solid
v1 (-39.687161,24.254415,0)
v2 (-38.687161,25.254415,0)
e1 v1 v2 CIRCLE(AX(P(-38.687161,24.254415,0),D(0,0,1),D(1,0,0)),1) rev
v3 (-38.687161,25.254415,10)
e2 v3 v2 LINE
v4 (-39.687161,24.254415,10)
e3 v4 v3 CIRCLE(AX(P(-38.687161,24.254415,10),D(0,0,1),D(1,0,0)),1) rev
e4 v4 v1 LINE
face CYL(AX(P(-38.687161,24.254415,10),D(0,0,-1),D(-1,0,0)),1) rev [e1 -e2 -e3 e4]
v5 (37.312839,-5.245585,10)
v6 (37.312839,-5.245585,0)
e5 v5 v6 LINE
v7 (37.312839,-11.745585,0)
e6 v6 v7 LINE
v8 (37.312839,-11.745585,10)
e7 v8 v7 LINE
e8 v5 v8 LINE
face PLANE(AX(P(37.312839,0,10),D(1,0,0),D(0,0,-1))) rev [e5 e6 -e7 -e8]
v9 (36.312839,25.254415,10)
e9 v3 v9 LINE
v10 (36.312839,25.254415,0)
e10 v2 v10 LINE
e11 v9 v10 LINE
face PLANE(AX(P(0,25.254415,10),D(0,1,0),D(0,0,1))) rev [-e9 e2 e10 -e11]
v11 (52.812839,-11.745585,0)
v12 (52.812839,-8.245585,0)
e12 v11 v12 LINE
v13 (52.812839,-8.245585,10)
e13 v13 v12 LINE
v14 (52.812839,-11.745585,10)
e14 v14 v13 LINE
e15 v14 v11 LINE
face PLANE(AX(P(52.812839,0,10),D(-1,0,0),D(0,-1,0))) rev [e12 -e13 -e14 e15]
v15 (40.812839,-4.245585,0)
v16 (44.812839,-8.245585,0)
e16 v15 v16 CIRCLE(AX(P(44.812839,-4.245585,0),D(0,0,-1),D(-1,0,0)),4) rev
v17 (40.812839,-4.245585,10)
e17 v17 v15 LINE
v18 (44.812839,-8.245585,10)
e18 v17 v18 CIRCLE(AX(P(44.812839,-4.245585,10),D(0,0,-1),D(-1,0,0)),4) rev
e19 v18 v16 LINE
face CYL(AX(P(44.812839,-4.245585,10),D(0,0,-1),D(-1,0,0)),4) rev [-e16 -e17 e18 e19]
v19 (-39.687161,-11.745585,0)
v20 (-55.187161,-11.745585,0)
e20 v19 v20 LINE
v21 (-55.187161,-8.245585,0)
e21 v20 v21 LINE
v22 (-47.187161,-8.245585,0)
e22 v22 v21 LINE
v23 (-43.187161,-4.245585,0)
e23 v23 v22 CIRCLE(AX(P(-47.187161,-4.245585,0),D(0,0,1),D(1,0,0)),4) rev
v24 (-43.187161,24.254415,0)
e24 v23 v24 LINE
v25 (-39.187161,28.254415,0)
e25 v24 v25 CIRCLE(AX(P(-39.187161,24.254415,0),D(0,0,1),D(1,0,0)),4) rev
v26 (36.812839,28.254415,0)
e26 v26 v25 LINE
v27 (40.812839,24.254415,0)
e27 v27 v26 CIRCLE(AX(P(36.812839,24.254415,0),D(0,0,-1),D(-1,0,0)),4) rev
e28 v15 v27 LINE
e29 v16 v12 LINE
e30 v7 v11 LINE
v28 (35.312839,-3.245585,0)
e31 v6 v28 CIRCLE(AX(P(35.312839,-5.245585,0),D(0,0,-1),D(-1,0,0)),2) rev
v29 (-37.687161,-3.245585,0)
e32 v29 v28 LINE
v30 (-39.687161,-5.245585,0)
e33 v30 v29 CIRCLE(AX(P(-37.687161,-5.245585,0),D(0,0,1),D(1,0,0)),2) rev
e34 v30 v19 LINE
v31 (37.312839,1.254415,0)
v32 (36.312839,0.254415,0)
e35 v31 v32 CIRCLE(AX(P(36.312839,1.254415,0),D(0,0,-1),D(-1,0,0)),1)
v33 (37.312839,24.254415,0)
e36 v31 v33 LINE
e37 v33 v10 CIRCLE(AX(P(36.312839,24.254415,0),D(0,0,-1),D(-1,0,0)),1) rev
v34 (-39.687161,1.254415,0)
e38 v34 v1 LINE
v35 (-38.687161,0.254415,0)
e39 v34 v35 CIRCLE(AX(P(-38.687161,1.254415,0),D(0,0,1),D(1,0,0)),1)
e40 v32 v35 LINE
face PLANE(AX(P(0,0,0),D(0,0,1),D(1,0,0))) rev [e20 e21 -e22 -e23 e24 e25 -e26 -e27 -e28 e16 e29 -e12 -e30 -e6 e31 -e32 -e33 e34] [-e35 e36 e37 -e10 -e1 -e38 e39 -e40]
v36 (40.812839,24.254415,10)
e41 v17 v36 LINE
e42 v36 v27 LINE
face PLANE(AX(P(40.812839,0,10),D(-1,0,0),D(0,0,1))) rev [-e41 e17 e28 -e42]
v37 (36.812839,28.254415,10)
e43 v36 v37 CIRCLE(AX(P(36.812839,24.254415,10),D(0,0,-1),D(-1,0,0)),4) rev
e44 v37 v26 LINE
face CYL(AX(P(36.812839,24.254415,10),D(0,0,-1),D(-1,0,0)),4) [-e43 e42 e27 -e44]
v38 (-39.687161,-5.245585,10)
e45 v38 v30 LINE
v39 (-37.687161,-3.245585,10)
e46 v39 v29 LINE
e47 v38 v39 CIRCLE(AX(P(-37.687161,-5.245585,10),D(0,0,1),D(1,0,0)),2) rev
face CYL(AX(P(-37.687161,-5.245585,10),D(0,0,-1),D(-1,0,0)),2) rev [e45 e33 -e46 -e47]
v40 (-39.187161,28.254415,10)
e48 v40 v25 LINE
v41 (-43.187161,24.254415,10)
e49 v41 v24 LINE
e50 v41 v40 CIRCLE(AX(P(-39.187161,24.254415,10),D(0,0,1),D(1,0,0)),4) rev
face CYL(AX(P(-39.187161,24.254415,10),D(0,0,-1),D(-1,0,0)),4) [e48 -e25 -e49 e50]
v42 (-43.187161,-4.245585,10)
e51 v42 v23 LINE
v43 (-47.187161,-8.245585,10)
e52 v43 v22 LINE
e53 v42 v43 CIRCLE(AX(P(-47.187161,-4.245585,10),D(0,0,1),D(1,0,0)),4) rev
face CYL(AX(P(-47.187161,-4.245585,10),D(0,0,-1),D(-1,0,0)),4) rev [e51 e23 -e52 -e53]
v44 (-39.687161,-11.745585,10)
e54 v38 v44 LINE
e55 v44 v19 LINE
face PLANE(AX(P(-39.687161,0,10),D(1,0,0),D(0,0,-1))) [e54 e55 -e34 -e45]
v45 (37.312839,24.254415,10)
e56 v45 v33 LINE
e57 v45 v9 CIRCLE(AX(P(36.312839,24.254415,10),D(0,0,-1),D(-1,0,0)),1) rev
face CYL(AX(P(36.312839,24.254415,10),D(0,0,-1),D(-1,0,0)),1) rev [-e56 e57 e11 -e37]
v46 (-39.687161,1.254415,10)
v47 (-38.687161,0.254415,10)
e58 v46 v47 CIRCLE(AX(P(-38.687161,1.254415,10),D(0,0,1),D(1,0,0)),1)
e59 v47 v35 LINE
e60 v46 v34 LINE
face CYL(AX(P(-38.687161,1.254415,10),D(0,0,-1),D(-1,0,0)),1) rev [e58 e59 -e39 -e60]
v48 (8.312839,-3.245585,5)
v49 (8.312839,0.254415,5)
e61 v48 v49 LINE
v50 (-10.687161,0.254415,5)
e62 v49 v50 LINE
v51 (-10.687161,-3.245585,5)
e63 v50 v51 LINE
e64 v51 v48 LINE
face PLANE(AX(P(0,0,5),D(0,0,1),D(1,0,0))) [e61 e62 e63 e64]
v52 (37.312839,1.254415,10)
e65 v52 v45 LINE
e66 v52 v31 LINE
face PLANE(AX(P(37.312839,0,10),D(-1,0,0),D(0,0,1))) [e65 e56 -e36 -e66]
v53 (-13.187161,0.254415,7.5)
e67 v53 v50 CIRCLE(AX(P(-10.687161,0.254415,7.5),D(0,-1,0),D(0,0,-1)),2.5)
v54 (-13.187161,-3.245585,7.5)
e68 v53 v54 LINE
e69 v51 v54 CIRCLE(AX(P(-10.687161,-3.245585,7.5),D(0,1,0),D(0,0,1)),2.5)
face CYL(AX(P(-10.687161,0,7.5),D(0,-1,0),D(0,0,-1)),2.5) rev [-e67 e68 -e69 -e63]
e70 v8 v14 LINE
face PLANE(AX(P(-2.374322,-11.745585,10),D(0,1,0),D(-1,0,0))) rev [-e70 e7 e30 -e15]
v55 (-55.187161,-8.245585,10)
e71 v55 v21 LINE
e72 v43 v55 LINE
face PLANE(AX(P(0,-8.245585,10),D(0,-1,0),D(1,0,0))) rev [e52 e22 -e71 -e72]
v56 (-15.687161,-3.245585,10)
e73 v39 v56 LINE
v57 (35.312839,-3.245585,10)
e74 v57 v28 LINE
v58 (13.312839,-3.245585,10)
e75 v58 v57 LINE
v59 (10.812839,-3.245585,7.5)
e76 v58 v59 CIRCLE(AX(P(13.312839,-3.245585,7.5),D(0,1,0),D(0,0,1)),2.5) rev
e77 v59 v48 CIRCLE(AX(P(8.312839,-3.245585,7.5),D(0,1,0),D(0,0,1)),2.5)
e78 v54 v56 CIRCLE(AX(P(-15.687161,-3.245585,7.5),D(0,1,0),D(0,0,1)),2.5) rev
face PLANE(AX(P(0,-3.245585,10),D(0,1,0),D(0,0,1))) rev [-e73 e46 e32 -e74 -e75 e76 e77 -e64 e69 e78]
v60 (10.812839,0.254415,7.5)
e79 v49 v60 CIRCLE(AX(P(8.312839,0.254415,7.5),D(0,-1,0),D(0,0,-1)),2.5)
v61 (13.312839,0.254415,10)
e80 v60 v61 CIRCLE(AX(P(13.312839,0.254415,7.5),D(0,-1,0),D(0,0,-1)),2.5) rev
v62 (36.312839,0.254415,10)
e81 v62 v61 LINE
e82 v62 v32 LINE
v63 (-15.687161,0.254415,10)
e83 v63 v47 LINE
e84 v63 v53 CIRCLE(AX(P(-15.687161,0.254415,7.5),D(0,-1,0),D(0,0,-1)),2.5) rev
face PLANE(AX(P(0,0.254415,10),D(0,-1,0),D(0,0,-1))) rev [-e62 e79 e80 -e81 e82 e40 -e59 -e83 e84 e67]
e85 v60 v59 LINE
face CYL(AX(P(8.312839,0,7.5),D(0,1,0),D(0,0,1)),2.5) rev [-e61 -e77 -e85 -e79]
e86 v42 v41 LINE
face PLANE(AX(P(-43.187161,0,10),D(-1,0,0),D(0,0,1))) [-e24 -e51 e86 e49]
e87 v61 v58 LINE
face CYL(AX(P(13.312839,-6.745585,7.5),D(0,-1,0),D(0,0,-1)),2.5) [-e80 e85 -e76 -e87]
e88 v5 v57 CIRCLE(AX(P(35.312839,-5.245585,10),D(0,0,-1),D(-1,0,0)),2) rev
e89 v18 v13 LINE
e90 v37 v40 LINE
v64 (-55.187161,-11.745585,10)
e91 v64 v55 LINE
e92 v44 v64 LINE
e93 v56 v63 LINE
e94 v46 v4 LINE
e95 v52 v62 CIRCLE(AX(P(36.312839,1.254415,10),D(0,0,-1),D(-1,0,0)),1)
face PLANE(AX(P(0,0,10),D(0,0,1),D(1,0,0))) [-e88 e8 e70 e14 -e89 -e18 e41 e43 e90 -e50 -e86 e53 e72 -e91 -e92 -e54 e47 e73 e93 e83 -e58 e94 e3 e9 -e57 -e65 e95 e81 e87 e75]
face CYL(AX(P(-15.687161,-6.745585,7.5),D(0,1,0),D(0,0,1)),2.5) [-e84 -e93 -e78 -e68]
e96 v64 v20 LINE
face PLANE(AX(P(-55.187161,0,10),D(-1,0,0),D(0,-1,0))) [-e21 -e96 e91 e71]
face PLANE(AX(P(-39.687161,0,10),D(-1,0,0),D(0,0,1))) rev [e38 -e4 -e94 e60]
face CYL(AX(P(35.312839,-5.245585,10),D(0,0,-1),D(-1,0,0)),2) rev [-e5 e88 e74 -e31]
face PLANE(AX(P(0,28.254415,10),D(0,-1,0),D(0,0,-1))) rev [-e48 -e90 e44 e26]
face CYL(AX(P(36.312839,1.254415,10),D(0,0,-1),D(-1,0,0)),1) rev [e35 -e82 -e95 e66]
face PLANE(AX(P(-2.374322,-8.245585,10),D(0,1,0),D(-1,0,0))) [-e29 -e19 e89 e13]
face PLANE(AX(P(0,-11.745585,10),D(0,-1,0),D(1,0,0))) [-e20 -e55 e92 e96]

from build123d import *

# Parameters (mm, degrees)
SALIENTE_EXTRUIR2_DEPTH = 10
CROQUIS9_W              = 24
CROQUIS9_H              = 7
CORTAR_EXTRUIR2_DEPTH   = 5
REDONDEO3_R             = 2.5


with BuildPart() as part:
    # Croquis1 → Saliente-Extruir2 (new body)
    with BuildSketch(Plane.XY):
        with BuildLine():
            ThreePointArc((-38.687161159, 0.254415054), (-39.39426794, 0.547308273), (-39.687161159, 1.254415054))
            Line((-39.687161159, 1.254415054), (-39.687161159, 24.254415054))
            ThreePointArc((-39.687161159, 24.254415054), (-39.39426794, 24.961521836), (-38.687161159, 25.254415054))
            Line((-38.687161159, 25.254415054), (-1.187161159, 25.254415054))
            Line((-1.187161159, 25.254415054), (-1.187161159, 28.254415054))
            Line((-1.187161159, 28.254415054), (-39.187161159, 28.254415054))
            ThreePointArc((-39.187161159, 28.254415054), (-42.015588284, 27.082842179), (-43.187161159, 24.254415054))
            Line((-43.187161159, 24.254415054), (-43.187161159, -3.245584946))
            Line((-43.187161159, -3.245584946), (-43.187161159, -4.245584946))
            ThreePointArc((-43.187161159, -4.245584946), (-44.358734034, -7.07401207), (-47.187161159, -8.245584946))
            Line((-47.187161159, -8.245584946), (-55.187161159, -8.245584946))
            Line((-55.187161159, -8.245584946), (-55.187161159, -11.745584946))
            Line((-55.187161159, -11.745584946), (-43.187161159, -11.745584946))
            Line((-43.187161159, -11.745584946), (-39.687161159, -11.745584946))
            Line((-39.687161159, -11.745584946), (-39.687161159, -5.245584946))
            ThreePointArc((-39.687161159, -5.245584946), (-39.101374721, -3.831371383), (-37.687161159, -3.245584946))
            Line((-37.687161159, -3.245584946), (-1.187161159, -3.245584946))
            Line((-1.187161159, -3.245584946), (-1.187161159, 0.254415054))
            Line((-1.187161159, 0.254415054), (-38.687161159, 0.254415054))
        make_face()
    saliente_extruir2 = extrude(amount=SALIENTE_EXTRUIR2_DEPTH)

    # Simetría2: Saliente-Extruir2 across plane
    add(saliente_extruir2.mirror(Plane(origin=(-1.187161159, 0, 10), x_dir=(0, 0, 1), z_dir=(-1, 0, 0))))

    # Croquis9 → Cortar-Extruir2 (cut)
    with BuildSketch(Plane.XY.offset(10)):
        with Locations((-1.187161159, -3.245584946)):
            Rectangle(CROQUIS9_W, CROQUIS9_H)
    extrude(amount=-CORTAR_EXTRUIR2_DEPTH, mode=Mode.SUBTRACT)

    # Redondeo3
    redondeo3_edges = [part.edges().sort_by_distance(p)[0] for p in [
        (10.812838841, -1.495584946, 5),
        (-13.187161159, -1.495584946, 5),
    ]]
    fillet(redondeo3_edges, radius=REDONDEO3_R)
    redondeo3_2_edges = [part.edges().sort_by_distance(p)[0] for p in [
        (10.812838841, -1.495584946, 10),
        (-13.187161159, -1.495584946, 10),
    ]]
    fillet(redondeo3_2_edges, radius=REDONDEO3_R - 0.0001)  # a hair under: the kernel refuses the full size


solid = part.part
